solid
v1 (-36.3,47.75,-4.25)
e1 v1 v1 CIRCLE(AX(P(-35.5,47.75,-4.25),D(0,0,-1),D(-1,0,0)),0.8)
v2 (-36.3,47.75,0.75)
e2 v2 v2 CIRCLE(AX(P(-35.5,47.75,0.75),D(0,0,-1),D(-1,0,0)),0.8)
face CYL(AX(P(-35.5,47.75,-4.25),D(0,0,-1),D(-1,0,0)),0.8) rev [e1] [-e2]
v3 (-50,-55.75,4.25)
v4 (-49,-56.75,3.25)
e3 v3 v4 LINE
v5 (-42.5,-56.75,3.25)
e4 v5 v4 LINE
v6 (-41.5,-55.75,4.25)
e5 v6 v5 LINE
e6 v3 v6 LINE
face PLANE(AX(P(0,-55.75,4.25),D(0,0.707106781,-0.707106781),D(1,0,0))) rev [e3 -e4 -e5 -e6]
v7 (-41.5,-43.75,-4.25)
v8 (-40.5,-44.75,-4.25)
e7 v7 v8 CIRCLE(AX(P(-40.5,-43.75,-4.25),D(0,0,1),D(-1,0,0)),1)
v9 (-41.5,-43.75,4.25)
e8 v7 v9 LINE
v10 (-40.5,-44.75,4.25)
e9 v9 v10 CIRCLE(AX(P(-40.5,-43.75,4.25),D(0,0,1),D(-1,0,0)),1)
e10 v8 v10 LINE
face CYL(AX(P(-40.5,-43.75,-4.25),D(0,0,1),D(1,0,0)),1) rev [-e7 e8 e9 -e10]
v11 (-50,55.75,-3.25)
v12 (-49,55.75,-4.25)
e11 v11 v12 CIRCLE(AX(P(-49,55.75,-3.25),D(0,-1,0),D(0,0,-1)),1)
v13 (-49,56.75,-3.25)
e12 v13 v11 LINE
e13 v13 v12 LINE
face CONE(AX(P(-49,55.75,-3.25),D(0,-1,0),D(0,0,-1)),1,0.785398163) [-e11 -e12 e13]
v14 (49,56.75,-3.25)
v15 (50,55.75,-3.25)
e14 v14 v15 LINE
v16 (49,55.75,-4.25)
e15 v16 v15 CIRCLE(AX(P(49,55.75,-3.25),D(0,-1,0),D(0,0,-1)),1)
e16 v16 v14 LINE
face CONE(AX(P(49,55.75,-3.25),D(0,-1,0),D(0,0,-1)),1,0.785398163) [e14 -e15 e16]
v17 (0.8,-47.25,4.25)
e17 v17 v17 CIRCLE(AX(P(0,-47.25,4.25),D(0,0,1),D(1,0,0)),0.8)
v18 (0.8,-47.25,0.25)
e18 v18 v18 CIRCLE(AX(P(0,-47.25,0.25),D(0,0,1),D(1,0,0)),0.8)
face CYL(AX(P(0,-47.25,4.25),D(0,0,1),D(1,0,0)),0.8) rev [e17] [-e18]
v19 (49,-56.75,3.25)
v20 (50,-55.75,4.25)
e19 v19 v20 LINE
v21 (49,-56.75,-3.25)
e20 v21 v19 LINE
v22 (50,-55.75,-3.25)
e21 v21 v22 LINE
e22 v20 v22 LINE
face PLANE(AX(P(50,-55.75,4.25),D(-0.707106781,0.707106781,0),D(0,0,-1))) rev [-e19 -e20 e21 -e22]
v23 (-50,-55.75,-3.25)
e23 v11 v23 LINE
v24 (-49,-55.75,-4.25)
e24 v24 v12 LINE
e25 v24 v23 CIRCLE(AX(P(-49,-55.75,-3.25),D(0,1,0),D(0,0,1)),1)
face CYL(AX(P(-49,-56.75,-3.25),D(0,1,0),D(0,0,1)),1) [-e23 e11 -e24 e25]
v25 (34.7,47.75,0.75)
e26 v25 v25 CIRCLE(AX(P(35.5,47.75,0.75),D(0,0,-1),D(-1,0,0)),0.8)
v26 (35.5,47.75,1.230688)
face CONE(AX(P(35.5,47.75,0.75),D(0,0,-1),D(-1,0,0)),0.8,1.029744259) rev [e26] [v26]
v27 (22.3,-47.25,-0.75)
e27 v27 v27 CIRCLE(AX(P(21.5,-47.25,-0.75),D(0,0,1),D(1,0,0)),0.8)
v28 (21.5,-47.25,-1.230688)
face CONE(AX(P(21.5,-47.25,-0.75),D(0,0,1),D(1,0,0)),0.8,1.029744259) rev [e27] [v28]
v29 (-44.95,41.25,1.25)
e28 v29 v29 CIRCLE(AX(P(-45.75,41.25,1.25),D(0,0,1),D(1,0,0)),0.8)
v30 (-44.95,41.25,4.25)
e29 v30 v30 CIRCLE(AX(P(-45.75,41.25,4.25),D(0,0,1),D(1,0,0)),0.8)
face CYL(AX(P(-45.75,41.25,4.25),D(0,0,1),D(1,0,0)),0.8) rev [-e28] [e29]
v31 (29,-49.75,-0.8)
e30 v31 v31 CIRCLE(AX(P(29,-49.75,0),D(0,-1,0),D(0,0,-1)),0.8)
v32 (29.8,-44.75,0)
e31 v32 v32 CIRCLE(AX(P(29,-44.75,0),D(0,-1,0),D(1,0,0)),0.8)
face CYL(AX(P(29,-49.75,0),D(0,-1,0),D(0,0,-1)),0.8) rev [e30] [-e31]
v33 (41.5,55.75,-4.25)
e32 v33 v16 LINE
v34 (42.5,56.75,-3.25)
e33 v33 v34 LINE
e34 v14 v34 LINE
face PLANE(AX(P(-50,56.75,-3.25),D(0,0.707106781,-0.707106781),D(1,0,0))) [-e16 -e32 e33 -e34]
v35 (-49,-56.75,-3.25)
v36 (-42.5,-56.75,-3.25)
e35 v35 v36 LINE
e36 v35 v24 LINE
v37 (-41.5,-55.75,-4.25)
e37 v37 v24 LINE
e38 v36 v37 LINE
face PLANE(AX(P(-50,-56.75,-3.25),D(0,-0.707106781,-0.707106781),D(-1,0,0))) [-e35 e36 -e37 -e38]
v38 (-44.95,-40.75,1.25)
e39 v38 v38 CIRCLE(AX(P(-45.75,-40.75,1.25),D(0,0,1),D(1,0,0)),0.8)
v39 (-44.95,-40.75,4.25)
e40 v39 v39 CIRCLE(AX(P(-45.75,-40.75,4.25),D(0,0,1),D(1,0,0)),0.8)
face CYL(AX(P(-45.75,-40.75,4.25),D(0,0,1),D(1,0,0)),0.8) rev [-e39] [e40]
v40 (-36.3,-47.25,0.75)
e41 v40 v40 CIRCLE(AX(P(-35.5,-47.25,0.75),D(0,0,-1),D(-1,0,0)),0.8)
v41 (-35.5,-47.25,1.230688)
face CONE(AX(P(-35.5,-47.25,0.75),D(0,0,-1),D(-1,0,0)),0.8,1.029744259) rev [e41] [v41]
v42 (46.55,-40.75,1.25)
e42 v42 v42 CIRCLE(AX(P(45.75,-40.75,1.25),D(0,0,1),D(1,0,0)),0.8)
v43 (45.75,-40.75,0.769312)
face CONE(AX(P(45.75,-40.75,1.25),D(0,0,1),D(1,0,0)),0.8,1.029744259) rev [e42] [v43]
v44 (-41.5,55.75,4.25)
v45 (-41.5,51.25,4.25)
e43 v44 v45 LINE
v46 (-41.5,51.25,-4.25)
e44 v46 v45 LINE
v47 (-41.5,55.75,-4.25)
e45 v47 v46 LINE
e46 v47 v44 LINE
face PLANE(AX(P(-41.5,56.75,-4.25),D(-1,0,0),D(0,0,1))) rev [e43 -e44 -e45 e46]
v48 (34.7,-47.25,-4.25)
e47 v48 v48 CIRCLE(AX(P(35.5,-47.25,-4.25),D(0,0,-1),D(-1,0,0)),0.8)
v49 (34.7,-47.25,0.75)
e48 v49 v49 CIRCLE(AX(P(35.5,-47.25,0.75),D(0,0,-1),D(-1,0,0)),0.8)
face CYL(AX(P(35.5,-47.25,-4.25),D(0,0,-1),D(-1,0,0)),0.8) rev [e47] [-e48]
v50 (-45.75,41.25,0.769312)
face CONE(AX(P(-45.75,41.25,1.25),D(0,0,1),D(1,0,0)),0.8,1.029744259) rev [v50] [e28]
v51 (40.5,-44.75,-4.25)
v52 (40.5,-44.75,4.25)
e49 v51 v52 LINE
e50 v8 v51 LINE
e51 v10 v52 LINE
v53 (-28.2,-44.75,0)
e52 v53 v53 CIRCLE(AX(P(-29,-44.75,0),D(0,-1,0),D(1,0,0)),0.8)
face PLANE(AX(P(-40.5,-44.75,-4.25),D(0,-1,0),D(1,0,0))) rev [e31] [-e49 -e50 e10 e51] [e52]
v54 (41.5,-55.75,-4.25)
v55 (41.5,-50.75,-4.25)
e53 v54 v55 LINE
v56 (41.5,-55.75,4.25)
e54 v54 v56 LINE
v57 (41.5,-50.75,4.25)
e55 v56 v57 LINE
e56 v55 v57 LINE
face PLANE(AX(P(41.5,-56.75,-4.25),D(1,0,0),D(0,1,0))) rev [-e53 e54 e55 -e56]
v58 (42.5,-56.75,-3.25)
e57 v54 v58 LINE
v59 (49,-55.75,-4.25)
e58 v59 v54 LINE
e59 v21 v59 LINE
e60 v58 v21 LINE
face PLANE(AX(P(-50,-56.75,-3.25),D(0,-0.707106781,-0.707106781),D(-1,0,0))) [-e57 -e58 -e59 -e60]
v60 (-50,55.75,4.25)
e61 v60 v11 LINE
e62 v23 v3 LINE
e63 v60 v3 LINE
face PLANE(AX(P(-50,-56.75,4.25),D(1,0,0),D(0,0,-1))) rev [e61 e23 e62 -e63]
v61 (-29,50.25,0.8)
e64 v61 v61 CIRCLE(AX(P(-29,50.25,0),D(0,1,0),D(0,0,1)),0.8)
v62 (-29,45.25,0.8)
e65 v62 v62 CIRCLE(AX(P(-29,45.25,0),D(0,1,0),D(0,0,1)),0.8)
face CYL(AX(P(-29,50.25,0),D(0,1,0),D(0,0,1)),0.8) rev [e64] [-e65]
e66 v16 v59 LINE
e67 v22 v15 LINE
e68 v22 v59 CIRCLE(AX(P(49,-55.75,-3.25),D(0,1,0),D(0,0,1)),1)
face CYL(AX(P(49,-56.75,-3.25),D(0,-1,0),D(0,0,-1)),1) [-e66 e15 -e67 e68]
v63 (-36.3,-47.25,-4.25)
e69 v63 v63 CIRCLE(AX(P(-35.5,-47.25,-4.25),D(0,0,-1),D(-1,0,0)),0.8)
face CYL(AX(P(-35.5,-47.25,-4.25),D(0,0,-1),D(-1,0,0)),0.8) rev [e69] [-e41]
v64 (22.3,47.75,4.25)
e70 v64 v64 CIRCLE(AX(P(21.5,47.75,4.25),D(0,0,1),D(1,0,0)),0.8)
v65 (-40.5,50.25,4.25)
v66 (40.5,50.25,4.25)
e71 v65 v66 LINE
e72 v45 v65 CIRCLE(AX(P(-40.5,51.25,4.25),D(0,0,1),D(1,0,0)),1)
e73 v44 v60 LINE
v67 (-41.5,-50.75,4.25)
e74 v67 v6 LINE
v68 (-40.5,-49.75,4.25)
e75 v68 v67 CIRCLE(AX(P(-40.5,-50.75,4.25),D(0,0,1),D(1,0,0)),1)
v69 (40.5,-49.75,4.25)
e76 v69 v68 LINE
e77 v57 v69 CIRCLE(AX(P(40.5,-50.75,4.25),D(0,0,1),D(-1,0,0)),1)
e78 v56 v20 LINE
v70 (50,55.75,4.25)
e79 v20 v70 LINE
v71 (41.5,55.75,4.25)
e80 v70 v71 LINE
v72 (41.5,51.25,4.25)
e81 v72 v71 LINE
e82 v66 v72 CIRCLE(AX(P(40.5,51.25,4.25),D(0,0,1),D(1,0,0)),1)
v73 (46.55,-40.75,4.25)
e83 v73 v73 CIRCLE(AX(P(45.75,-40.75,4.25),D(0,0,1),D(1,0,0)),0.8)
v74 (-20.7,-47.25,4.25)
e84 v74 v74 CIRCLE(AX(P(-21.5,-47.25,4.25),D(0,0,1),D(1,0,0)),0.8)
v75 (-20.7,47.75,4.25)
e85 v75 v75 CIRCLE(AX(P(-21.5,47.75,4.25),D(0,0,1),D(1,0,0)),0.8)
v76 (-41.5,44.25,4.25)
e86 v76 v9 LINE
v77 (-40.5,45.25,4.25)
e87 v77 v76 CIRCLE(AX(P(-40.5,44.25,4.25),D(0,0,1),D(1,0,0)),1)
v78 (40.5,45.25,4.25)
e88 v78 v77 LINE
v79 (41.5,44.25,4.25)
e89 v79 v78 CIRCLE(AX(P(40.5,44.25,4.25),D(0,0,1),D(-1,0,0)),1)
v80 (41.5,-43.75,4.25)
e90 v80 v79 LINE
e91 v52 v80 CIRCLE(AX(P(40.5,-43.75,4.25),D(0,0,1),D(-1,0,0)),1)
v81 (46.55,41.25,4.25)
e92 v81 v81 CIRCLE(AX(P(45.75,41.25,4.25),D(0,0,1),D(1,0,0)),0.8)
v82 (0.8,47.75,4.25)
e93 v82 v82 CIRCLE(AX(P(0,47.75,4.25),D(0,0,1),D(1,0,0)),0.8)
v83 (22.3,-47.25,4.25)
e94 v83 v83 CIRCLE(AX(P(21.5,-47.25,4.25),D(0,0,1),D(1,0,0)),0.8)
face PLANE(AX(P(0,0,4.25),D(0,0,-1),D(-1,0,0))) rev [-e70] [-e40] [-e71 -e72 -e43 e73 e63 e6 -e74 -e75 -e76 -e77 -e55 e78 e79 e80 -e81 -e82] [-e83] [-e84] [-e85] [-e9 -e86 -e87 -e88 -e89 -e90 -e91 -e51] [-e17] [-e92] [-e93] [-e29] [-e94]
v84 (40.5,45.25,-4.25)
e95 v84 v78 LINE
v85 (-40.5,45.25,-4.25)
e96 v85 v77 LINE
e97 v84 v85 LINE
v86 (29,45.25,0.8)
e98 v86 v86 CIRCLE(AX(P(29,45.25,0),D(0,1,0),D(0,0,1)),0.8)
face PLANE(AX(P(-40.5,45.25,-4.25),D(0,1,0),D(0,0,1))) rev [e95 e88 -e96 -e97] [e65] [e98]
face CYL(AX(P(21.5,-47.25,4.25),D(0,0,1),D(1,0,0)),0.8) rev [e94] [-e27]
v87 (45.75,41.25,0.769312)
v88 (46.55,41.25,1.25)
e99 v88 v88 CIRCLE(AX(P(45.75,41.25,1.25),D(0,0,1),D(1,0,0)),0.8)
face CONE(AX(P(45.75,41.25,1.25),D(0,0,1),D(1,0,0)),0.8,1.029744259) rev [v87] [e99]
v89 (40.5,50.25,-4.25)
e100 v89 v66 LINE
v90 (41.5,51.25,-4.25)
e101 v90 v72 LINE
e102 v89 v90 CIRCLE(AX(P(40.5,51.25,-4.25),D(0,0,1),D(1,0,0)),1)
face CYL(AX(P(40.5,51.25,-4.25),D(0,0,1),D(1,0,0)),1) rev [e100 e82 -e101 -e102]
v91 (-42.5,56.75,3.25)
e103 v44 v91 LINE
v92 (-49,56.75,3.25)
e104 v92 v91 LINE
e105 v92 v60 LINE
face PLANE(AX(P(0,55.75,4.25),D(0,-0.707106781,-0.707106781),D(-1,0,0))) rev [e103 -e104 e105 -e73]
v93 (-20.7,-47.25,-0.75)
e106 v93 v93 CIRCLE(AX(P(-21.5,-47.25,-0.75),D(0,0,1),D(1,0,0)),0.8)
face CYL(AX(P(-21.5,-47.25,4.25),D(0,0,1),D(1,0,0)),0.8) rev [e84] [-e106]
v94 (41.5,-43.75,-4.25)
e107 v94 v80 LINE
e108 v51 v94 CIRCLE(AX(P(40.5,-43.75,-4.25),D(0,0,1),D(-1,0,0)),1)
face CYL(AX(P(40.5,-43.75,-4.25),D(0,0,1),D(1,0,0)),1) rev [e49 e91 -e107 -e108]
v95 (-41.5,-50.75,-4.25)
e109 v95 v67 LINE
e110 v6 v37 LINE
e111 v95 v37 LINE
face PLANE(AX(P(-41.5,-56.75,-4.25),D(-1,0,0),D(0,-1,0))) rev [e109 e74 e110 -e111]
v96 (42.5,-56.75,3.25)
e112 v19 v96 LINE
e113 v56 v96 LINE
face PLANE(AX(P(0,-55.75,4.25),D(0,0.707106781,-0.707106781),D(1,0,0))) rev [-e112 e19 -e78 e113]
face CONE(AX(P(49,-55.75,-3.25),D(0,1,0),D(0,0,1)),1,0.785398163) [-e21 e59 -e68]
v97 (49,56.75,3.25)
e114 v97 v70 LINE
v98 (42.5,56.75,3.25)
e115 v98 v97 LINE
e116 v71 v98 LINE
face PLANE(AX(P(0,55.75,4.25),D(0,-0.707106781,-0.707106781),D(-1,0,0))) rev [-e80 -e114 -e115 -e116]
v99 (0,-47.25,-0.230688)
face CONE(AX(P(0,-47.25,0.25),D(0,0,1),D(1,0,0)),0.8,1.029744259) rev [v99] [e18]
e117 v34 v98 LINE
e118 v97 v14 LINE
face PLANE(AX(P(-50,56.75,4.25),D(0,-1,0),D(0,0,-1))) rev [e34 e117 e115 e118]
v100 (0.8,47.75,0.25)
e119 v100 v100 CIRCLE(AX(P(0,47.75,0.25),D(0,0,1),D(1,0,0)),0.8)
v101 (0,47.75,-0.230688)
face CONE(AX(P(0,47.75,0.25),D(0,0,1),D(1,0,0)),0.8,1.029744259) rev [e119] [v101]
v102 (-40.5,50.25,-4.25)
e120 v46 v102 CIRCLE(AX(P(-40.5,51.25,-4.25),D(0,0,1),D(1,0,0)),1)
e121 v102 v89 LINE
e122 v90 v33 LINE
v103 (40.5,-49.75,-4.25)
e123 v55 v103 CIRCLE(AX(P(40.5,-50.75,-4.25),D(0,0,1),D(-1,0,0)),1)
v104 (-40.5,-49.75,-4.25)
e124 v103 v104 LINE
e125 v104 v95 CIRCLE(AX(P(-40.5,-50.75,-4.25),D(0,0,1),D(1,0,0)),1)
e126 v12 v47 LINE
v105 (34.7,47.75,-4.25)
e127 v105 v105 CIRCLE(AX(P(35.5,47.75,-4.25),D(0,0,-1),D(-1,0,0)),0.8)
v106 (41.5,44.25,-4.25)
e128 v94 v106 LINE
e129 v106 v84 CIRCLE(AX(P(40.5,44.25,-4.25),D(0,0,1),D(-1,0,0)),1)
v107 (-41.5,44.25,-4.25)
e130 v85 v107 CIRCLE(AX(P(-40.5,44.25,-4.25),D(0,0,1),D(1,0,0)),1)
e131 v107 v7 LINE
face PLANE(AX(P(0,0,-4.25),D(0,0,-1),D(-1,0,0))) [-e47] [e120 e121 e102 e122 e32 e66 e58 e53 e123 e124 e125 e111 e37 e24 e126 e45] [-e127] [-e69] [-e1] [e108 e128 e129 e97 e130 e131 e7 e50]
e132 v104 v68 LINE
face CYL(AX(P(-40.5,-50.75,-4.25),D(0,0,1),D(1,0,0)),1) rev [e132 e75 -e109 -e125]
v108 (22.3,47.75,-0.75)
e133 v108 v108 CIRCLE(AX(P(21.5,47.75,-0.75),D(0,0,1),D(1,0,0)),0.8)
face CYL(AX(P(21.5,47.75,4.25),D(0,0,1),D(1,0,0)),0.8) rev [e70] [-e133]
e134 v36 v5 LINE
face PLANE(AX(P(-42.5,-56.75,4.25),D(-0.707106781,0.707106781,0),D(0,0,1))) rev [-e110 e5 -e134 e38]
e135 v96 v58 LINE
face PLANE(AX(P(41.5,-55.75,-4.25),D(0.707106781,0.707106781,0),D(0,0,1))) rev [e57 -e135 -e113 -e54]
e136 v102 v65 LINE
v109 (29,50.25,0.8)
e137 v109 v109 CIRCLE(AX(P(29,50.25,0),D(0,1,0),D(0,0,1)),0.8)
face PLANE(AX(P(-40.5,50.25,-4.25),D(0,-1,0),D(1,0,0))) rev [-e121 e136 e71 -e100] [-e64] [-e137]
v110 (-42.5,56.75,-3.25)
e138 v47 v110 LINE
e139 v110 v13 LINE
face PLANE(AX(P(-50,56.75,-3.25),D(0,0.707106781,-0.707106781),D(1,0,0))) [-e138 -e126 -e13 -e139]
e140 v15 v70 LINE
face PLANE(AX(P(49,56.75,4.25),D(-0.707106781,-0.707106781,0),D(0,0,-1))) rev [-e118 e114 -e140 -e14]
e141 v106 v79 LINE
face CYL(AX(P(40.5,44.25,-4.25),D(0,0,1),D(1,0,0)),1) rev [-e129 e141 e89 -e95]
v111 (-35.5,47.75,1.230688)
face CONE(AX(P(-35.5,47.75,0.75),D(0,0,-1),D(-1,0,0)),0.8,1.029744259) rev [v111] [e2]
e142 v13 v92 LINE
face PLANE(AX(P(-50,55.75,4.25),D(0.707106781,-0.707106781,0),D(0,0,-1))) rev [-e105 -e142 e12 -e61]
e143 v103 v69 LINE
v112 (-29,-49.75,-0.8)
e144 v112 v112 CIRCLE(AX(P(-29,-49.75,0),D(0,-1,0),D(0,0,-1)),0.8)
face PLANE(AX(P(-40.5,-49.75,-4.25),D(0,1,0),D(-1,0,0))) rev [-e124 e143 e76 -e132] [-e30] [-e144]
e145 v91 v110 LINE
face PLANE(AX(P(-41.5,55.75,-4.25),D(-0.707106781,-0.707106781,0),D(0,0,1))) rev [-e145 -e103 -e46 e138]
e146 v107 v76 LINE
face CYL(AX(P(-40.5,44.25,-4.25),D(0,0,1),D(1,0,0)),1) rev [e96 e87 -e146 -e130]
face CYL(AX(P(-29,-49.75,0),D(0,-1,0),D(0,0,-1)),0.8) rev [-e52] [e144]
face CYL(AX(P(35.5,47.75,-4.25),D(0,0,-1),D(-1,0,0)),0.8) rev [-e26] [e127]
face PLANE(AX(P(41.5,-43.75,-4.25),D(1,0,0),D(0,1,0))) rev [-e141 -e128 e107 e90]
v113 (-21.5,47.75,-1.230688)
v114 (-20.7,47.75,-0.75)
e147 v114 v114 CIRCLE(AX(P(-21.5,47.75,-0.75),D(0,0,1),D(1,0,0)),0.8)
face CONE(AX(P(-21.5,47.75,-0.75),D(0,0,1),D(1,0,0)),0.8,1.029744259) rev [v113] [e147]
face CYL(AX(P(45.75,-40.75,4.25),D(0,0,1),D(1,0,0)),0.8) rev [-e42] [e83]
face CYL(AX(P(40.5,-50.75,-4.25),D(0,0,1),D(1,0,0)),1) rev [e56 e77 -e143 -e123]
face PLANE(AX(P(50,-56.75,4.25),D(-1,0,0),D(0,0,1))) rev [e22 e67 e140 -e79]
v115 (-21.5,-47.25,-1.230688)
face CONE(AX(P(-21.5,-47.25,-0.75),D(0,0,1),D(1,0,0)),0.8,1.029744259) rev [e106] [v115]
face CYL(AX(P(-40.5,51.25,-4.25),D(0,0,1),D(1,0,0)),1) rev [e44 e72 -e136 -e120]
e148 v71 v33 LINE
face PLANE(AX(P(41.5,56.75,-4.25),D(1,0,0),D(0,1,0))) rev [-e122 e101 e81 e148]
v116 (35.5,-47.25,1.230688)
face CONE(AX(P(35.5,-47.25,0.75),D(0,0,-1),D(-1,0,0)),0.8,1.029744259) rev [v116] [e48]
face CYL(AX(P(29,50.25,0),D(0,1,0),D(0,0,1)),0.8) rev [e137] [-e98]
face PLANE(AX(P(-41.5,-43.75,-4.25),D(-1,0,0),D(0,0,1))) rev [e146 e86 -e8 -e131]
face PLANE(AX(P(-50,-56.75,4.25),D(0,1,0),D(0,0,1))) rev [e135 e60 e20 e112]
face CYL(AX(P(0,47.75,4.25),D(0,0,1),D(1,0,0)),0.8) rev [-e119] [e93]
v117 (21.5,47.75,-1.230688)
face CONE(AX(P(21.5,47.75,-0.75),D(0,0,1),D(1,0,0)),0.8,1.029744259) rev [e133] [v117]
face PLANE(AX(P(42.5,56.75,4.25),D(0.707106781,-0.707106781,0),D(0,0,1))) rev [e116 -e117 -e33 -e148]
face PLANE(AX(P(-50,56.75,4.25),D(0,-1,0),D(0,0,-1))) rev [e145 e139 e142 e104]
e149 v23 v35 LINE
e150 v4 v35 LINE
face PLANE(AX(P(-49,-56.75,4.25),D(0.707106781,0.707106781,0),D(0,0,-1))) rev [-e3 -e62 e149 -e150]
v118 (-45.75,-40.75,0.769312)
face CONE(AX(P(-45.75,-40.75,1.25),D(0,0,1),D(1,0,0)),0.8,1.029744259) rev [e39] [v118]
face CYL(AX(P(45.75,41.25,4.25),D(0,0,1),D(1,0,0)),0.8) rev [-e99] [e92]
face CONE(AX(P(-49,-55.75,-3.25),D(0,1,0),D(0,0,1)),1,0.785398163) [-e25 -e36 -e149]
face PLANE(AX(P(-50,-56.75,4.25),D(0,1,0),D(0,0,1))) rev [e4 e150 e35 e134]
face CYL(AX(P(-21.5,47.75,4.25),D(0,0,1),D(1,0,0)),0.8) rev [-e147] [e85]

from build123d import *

# Parameters (mm, degrees)
SKETCH1_W           = 100
SKETCH1_H           = 113.5
BOSS_EXTRUDE1_DEPTH = 4.25
CUT_EXTRUDE1_DEPTH  = 77.110528181
M2_HOLE1_C_D        = 1.6
M2_HOLE1_C_DEPTH    = 3
M2_HOLE1_C_TIP      = 0.480688495
M2_HOLE2_D_D        = 1.6
M2_HOLE2_D_DEPTH    = 5
M2_HOLE2_D_TIP      = 0.480688495
M2_HOLE3_E_D        = 1.6
M2_HOLE3_E_DEPTH    = 4
M2_HOLE3_E_TIP      = 0.480688495
M2_HOLE4_F_D        = 1.6
M2_HOLE4_F_DEPTH    = 10
M2_HOLE4_F_TIP      = 0.480688495
M2_HOLE5_G_D        = 1.6
M2_HOLE5_G_DEPTH    = 10
M2_HOLE5_G_TIP      = 0.480688495
M2_HOLE6_H_D        = 1.6
M2_HOLE6_H_DEPTH    = 5
M2_HOLE6_H_TIP      = 0.480688495
FILLET1_R           = 1
CHAMFER1_SIZE       = 1


with BuildPart() as part:
    # Sketch1 → Boss-Extrude1 (new, symmetric)
    with BuildSketch(Plane.XY):
        Rectangle(SKETCH1_W, SKETCH1_H)
    extrude(amount=BOSS_EXTRUDE1_DEPTH, both=True)

    # Sketch4 → Cut-Extrude1 (cut, through all)
    with BuildSketch(Plane.XY.offset(4.25)):
        with BuildLine():
            Line((-40.5, -44.75), (40.5, -44.75))
            ThreePointArc((40.5, -44.75), (41.207106781, -44.457106781), (41.5, -43.75))
            Line((41.5, -43.75), (41.5, 44.25))
            ThreePointArc((41.5, 44.25), (41.207106781, 44.957106781), (40.5, 45.25))
            Line((40.5, 45.25), (-40.5, 45.25))
            ThreePointArc((-40.5, 45.25), (-41.207106781, 44.957106781), (-41.5, 44.25))
            Line((-41.5, 44.25), (-41.5, -43.75))
            ThreePointArc((-41.5, -43.75), (-41.207106781, -44.457106781), (-40.5, -44.75))
        make_face()
        with BuildLine():
            Line((-41.5, 56.75), (41.5, 56.75))
            Line((41.5, 56.75), (41.5, 51.25))
            ThreePointArc((41.5, 51.25), (41.207106781, 50.542893219), (40.5, 50.25))
            Line((40.5, 50.25), (-40.5, 50.25))
            ThreePointArc((-40.5, 50.25), (-41.207106781, 50.542893219), (-41.5, 51.25))
            Line((-41.5, 51.25), (-41.5, 56.75))
        make_face()
        with BuildLine():
            Line((-41.5, -56.75), (41.5, -56.75))
            Line((41.5, -56.75), (41.5, -50.75))
            ThreePointArc((41.5, -50.75), (41.207106781, -50.042893219), (40.5, -49.75))
            Line((40.5, -49.75), (-40.5, -49.75))
            ThreePointArc((-40.5, -49.75), (-41.207106781, -50.042893219), (-41.5, -50.75))
            Line((-41.5, -50.75), (-41.5, -56.75))
        make_face()
    extrude(amount=-CUT_EXTRUDE1_DEPTH, mode=Mode.SUBTRACT)

    # M2 Hole1-C
    with Locations(Plane.XY.offset(4.25)):
        with Locations((-45.75, -40.75), (45.75, -40.75), (-45.75, 41.25), (45.75, 41.25)):
            Hole(M2_HOLE1_C_D / 2, depth=M2_HOLE1_C_DEPTH)
            with Locations((0, 0, -(M2_HOLE1_C_DEPTH + M2_HOLE1_C_TIP / 2))):  # 118° drill point
                Cone(0, M2_HOLE1_C_D / 2, M2_HOLE1_C_TIP, mode=Mode.SUBTRACT)

    # M2 Hole2-D
    with Locations(Plane.XY.offset(4.25)):
        with Locations((-21.5, 47.75), (21.5, 47.75), (-21.5, -47.25), (21.5, -47.25)):
            Hole(M2_HOLE2_D_D / 2, depth=M2_HOLE2_D_DEPTH)
            with Locations((0, 0, -(M2_HOLE2_D_DEPTH + M2_HOLE2_D_TIP / 2))):  # 118° drill point
                Cone(0, M2_HOLE2_D_D / 2, M2_HOLE2_D_TIP, mode=Mode.SUBTRACT)

    # M2 Hole3-E
    with Locations(Plane.XY.offset(4.25)):
        with Locations((0, 47.75), (0, -47.25)):
            Hole(M2_HOLE3_E_D / 2, depth=M2_HOLE3_E_DEPTH)
            with Locations((0, 0, -(M2_HOLE3_E_DEPTH + M2_HOLE3_E_TIP / 2))):  # 118° drill point
                Cone(0, M2_HOLE3_E_D / 2, M2_HOLE3_E_TIP, mode=Mode.SUBTRACT)

    # M2 Hole4-F
    with Locations(Plane(origin=(0, 50.25, 0), x_dir=(1, 0, 0), z_dir=(0, 1, 0))):
        with Locations((-29, 0), (29, 0)):
            Hole(M2_HOLE4_F_D / 2, depth=M2_HOLE4_F_DEPTH)
            with Locations((0, 0, -(M2_HOLE4_F_DEPTH + M2_HOLE4_F_TIP / 2))):  # 118° drill point
                Cone(0, M2_HOLE4_F_D / 2, M2_HOLE4_F_TIP, mode=Mode.SUBTRACT)

    # M2 Hole5-G
    with Locations(Plane(origin=(0, -49.75, 0), x_dir=(-1, 0, 0), z_dir=(0, -1, 0))):
        with Locations((29, 0), (-29, 0)):
            Hole(M2_HOLE5_G_D / 2, depth=M2_HOLE5_G_DEPTH)
            with Locations((0, 0, -(M2_HOLE5_G_DEPTH + M2_HOLE5_G_TIP / 2))):  # 118° drill point
                Cone(0, M2_HOLE5_G_D / 2, M2_HOLE5_G_TIP, mode=Mode.SUBTRACT)

    # M2 Hole6-H
    with Locations(Plane(origin=(0, 0, -4.25), x_dir=(-1, 0, 0), z_dir=(0, 0, -1))):
        with Locations((-35.5, 47.75), (35.5, 47.75), (-35.5, -47.25), (35.5, -47.25)):
            Hole(M2_HOLE6_H_D / 2, depth=M2_HOLE6_H_DEPTH)
            with Locations((0, 0, -(M2_HOLE6_H_DEPTH + M2_HOLE6_H_TIP / 2))):  # 118° drill point
                Cone(0, M2_HOLE6_H_D / 2, M2_HOLE6_H_TIP, mode=Mode.SUBTRACT)

    # Fillet1
    fillet1_edges = [part.edges().sort_by_distance(p)[0] for p in [
        (-50, 0, -4.25),
        (50, 0, -4.25),
    ]]
    fillet(fillet1_edges, radius=FILLET1_R)

    # Chamfer1
    chamfer1_edges = [part.edges().sort_by_distance(p)[0] for p in [
        (-45.75, -56.75, 4.25),
        (45.25, -56.75, -4.25),
        (45.75, -56.75, 4.25),
        (-45.25, -56.75, -4.25),
        (-49.707106781, -56.75, -3.957106781),
        (45.25, 56.75, -4.25),
        (-49.707106781, 56.75, -3.957106781),
        (49.707106781, 56.75, -3.957106781),
        (49.707106781, -56.75, -3.957106781),
        (41.5, -56.75, 0),
        (-41.5, -56.75, 0),
        (-45.25, 56.75, -4.25),
        (-45.75, 56.75, 4.25),
        (-41.5, 56.75, 0),
        (41.5, 56.75, 0),
        (45.75, 56.75, 4.25),
        (50, -56.75, 0.5),
        (-50, -56.75, 0.5),
        (-50, 56.75, 0.5),
        (50, 56.75, 0.5),
    ]]
    chamfer(chamfer1_edges, length=CHAMFER1_SIZE - 0.0001)  # a hair under: the kernel refuses the full size


solid = part.part
